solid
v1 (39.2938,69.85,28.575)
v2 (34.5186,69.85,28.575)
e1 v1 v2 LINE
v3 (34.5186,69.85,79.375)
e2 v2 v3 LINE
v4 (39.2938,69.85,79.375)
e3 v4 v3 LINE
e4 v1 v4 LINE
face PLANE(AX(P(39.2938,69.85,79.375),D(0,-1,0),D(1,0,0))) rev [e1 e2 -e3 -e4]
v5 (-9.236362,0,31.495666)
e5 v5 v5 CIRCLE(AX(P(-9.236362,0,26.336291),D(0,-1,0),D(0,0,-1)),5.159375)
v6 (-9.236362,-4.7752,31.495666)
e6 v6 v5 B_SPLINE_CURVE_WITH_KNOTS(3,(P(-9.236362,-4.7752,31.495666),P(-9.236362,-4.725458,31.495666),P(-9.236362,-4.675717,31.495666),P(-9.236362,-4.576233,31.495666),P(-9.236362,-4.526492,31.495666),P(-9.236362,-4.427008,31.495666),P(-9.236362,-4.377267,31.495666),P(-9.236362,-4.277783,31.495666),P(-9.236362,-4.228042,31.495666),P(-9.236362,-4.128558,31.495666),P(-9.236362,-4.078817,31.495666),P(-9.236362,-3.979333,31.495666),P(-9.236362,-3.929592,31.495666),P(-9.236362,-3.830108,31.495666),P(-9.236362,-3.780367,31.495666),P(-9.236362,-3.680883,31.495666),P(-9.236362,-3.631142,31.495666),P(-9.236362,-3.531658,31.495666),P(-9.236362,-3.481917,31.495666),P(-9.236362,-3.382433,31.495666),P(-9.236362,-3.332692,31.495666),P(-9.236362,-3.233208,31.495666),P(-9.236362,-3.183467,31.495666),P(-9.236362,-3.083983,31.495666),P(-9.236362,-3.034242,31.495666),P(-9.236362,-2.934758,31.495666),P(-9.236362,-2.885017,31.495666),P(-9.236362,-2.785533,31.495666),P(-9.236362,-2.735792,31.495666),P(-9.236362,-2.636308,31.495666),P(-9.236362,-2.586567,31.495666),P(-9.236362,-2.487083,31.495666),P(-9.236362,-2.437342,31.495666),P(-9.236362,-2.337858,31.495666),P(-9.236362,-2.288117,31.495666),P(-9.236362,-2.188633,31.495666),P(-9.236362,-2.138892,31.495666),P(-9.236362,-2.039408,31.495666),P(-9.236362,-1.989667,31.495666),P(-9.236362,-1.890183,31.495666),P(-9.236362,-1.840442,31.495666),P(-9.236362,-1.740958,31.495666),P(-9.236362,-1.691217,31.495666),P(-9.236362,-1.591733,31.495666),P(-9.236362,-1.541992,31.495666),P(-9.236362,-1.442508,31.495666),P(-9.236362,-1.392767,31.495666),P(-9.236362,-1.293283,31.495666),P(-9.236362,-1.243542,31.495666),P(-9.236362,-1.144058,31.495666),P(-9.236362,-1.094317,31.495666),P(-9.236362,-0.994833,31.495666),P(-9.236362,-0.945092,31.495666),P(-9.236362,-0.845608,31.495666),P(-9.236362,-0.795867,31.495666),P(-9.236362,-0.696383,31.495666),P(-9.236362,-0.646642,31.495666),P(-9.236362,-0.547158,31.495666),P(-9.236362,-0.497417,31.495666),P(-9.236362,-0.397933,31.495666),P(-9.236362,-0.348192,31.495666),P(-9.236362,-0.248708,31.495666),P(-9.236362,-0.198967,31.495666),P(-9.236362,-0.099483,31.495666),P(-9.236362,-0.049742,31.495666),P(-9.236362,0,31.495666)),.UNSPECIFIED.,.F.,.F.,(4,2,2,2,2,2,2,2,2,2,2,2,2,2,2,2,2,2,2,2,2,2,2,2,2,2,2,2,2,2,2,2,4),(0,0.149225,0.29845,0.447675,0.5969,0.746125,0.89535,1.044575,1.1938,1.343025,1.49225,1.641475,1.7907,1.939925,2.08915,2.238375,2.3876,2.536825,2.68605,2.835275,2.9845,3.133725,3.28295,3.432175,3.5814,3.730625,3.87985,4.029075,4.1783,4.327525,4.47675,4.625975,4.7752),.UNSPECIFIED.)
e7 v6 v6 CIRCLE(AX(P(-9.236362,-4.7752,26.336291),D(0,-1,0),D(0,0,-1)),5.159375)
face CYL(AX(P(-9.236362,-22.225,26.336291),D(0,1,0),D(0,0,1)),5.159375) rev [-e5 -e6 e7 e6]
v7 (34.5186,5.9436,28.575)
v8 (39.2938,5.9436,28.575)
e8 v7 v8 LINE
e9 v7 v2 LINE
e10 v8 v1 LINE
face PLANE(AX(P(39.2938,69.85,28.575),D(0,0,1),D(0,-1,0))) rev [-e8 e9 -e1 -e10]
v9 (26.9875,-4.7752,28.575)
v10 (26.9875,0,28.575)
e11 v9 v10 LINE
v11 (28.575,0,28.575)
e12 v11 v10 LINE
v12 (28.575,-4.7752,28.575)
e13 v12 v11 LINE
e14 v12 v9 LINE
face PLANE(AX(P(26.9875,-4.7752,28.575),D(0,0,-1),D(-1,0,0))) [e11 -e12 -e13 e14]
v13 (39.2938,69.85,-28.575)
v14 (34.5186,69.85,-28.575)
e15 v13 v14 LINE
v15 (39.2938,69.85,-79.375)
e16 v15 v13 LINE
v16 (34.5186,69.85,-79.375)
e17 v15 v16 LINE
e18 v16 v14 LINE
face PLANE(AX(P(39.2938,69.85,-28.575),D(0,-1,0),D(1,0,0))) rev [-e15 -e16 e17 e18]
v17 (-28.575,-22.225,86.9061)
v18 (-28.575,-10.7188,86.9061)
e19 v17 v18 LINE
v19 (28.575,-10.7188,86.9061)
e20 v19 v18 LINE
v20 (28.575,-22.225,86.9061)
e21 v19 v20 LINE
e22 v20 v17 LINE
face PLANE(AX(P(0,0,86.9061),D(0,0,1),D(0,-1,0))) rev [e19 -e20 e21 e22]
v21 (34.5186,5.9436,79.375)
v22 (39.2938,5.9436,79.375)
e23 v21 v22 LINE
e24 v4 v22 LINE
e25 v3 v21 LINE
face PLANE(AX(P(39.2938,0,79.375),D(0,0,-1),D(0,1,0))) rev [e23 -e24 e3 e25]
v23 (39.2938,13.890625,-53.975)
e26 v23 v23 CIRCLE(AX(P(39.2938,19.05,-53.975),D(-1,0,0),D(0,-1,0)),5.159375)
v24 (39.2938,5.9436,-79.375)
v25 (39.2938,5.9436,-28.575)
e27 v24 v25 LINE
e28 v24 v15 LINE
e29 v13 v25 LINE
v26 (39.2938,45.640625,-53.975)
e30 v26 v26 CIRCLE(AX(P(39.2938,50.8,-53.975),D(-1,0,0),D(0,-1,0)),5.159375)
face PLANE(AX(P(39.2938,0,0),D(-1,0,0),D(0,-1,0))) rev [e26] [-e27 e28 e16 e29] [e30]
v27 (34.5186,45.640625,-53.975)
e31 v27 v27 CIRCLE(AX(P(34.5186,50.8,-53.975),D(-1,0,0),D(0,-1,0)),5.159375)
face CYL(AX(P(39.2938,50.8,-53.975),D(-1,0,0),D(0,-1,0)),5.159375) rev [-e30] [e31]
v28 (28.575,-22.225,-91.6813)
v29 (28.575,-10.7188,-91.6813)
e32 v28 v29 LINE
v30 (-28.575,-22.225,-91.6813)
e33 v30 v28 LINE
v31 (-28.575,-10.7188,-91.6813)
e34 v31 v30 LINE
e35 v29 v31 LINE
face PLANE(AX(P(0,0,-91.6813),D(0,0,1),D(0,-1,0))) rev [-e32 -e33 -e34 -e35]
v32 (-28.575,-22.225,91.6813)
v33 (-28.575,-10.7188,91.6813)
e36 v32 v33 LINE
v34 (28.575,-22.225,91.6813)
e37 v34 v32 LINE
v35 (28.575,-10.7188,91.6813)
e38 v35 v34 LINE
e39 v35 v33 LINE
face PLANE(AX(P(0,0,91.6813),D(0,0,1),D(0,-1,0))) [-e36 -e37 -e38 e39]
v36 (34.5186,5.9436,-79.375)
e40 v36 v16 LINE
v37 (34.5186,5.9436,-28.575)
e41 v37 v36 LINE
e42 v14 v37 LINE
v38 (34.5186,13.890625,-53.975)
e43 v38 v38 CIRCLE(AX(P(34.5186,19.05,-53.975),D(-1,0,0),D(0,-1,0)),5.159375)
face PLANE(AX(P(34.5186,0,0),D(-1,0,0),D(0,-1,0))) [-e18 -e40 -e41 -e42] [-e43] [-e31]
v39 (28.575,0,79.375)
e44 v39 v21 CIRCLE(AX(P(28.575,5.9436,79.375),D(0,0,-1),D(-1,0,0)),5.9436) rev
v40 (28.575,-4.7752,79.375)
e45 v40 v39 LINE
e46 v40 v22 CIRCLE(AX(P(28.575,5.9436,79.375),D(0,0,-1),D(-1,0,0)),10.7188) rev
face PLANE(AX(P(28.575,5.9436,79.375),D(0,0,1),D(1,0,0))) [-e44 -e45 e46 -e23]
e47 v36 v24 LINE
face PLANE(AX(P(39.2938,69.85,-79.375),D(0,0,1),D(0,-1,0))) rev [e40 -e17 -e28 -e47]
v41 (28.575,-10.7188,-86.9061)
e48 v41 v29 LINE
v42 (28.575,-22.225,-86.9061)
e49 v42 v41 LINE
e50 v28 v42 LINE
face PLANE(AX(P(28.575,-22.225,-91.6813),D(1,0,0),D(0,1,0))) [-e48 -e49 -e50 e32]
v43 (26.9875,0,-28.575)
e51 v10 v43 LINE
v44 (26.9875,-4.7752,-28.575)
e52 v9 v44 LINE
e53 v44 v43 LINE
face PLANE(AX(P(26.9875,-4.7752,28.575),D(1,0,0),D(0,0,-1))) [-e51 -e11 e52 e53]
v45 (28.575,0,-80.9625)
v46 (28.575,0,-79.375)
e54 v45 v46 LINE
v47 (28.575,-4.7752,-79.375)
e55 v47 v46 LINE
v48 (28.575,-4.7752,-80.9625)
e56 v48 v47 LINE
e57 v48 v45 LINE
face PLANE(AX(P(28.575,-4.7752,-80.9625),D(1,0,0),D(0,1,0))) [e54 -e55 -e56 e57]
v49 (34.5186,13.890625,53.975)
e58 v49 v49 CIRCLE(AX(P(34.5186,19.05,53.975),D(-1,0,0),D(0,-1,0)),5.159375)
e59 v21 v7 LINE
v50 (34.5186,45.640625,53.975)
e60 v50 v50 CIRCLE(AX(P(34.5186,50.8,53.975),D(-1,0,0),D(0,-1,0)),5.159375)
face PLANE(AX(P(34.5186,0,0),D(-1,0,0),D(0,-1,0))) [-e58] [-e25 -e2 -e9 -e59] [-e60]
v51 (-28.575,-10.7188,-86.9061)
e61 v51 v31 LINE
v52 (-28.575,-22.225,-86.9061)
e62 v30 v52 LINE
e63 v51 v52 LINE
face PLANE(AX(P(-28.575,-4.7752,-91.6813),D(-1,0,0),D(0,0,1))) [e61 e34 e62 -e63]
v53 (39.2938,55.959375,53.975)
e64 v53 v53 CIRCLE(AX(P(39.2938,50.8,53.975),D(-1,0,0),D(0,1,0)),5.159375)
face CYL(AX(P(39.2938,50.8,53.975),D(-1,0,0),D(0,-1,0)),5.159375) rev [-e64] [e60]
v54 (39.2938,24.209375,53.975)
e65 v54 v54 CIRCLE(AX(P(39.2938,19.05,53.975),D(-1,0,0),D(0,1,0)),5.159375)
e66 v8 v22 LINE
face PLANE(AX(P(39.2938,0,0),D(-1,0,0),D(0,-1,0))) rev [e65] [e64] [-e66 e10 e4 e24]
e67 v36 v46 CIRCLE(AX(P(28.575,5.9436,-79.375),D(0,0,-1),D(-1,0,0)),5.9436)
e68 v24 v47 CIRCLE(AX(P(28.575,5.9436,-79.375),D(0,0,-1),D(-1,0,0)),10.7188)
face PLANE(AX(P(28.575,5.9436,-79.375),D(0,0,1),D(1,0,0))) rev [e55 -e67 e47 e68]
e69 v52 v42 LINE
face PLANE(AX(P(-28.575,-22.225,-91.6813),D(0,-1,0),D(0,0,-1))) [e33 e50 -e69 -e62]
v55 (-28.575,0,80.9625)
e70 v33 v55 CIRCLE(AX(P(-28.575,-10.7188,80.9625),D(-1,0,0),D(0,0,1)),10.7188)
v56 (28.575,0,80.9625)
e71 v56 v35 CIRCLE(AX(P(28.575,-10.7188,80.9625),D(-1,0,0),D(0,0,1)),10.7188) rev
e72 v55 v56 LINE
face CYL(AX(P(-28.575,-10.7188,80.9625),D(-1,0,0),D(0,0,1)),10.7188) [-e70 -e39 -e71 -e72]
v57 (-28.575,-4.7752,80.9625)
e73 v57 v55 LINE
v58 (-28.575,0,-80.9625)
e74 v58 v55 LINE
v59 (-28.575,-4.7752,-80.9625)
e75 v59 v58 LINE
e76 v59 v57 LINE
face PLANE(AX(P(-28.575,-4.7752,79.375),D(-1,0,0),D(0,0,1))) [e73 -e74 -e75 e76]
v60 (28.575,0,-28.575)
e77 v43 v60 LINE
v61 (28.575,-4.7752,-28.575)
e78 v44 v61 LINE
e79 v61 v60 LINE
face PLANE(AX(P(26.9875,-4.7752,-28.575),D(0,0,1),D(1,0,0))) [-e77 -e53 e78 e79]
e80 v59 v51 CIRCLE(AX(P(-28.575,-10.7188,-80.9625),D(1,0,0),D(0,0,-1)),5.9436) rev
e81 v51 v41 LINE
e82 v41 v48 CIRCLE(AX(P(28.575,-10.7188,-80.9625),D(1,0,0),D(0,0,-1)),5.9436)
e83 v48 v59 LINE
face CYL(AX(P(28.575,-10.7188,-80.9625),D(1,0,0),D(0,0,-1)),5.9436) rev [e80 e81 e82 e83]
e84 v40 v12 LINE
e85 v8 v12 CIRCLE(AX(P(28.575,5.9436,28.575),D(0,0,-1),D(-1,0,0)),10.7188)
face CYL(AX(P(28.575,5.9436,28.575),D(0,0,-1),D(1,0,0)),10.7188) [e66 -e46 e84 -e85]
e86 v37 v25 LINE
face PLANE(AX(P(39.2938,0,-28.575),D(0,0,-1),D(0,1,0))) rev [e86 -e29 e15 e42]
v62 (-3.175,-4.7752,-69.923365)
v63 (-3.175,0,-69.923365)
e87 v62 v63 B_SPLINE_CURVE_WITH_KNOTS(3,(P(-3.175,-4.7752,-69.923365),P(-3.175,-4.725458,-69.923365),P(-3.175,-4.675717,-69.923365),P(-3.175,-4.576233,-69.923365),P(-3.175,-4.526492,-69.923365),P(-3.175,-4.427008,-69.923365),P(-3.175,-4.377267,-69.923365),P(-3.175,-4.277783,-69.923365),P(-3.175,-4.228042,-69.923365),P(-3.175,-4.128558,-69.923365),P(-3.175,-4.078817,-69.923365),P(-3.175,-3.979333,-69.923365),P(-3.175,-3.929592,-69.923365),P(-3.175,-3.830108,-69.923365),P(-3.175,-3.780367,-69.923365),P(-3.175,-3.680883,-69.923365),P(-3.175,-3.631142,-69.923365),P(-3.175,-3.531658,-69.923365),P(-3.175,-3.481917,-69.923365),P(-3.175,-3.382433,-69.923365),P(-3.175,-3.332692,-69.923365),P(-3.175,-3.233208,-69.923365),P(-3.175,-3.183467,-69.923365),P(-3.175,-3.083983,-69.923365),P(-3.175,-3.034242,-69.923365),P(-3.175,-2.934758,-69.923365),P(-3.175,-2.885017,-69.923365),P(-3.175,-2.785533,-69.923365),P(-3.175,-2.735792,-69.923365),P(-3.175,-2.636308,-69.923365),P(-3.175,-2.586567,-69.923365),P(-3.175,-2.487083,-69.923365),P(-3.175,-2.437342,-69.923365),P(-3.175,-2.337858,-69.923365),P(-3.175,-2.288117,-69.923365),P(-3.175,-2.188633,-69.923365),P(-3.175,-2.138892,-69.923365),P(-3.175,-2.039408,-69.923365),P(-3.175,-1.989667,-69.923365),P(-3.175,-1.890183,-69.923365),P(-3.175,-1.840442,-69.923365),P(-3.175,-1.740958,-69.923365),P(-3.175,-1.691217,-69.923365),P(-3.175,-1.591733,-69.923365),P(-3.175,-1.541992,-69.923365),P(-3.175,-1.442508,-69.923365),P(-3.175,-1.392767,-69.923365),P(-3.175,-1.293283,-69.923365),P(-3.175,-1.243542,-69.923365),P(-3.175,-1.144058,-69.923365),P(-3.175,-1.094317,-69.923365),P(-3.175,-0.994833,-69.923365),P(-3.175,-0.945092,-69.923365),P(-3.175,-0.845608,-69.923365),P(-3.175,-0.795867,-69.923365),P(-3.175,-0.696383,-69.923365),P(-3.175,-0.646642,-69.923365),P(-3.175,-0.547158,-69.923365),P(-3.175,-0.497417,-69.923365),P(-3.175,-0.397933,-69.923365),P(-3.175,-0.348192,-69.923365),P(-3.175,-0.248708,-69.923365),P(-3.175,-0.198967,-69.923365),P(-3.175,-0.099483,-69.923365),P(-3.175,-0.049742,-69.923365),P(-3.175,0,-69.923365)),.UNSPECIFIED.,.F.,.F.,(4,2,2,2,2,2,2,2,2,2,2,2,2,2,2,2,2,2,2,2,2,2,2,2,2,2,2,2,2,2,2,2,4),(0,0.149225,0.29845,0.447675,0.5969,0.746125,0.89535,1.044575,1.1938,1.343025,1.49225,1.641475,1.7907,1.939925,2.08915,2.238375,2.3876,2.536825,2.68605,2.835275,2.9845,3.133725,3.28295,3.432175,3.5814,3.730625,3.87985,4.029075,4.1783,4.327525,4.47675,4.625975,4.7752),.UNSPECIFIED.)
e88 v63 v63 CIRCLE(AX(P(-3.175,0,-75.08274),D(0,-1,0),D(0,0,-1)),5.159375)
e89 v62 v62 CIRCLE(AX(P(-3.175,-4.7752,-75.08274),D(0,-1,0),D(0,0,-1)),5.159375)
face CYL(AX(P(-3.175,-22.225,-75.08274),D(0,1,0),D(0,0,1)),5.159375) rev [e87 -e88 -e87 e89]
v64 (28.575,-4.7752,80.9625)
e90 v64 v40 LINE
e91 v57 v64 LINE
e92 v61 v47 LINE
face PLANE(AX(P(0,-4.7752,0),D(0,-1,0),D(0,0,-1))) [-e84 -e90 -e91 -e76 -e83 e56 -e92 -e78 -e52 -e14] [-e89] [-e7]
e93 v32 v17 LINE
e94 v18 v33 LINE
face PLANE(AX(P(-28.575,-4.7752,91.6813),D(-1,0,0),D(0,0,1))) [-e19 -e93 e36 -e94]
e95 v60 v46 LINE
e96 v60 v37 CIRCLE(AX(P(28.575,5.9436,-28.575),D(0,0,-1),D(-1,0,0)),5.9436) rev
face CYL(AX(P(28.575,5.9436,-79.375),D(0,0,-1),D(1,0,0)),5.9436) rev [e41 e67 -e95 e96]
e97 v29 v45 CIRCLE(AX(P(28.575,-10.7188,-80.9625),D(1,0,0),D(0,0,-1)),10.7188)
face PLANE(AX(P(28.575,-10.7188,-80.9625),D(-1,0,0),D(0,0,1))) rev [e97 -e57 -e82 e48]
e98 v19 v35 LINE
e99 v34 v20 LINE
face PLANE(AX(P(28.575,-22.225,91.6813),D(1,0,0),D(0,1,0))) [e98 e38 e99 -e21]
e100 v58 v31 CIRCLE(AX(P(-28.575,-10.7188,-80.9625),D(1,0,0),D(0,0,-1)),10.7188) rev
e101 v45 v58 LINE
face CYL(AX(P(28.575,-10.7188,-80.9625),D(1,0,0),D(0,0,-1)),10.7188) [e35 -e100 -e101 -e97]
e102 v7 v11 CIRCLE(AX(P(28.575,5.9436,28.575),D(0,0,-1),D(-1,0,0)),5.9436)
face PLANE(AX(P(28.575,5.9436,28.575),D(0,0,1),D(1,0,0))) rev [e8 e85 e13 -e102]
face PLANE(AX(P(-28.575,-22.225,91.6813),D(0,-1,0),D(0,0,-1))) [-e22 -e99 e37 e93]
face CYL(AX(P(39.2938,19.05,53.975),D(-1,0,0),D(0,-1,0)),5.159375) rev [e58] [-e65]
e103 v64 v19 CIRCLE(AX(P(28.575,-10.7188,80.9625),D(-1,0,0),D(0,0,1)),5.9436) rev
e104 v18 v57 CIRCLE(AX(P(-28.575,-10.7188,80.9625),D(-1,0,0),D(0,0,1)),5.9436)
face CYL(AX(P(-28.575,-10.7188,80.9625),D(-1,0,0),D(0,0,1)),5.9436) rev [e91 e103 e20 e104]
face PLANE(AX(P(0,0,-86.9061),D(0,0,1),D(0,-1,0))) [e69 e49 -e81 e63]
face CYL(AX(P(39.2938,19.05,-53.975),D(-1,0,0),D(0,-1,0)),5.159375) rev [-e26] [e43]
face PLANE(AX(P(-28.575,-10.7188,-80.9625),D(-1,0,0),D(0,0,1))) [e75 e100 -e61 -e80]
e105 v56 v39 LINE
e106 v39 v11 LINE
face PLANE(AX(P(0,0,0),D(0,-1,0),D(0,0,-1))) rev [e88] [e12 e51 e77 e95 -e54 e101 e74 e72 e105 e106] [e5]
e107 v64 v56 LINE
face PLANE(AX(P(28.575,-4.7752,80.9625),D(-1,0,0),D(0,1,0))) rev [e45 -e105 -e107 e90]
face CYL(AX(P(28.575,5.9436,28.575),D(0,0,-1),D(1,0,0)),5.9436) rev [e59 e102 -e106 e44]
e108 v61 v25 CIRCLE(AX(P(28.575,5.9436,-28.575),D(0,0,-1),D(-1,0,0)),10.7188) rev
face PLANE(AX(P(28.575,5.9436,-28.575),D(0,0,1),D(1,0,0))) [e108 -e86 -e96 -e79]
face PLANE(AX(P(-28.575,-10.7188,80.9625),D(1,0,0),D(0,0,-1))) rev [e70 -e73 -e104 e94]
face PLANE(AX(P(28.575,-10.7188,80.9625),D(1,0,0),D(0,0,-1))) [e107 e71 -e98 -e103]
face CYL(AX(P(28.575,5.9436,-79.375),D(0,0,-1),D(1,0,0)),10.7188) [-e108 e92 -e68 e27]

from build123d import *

# Parameters (mm, degrees)
BASE_FLANGE1_DEPTH      = 4.7752
EDGE_FLANGE1_DEPTH      = 50.8
EDGE_FLANGE1_BEND_DEPTH = 50.8
EDGE_FLANGE2_DEPTH      = 57.15
EDGE_FLANGE2_BEND_DEPTH = 57.15
CUT_EXTRUDE1_DEPTH      = 132.397433882
CUT_EXTRUDE1_DEPTH_BACK = 132.397433882
SKETCH18_R              = 5.159375
CUT_EXTRUDE3_DEPTH      = 122.772271015
CUT_EXTRUDE3_DEPTH_BACK = 122.772271015
SKETCH20_R              = 5.159375


# Sheet-metal steps are written as plain solids
with BuildPart() as part:
    # Sketch1 → Base-Flange1 (new body)
    with BuildSketch(Plane(origin=(0, 0, 0), x_dir=(1, 0, 0), z_dir=(0, 1, 0))):
        Polygon((26.9875, -28.575), (26.9875, 28.575), (28.575, 28.575), (28.575, 79.375), (-28.575, 79.375), (-28.575, -79.375), (28.575, -79.375), (28.575, -28.575), align=None)
    extrude(amount=-BASE_FLANGE1_DEPTH)

    # Edge-Flange1 section (across the edge) → Edge-Flange1 (add)
    with BuildSketch(Plane(origin=(34.5186, 0, -28.575), x_dir=(-1, 0, 0), z_dir=(0, 0, -1))):
        with BuildLine():
            Line((-4.7752, 5.9436), (-4.7752, 69.85))
            Line((-4.7752, 69.85), (0, 69.85))
            Line((0, 69.85), (0, 5.9436))
            ThreePointArc((0, 5.9436), (1.740840135, 1.740840135), (5.9436, 0))
            Line((5.9436, 0), (5.9436, -4.7752))
            ThreePointArc((5.9436, -4.7752), (-1.635736166, -1.635736166), (-4.7752, 5.9436))
        make_face()
    extrude(amount=EDGE_FLANGE1_DEPTH)

    # Edge-Flange1 section 2 (across the edge) → Edge-Flange1 bend (add)
    with BuildSketch(Plane(origin=(34.5186, 0, 79.375), x_dir=(-1, 0, 0), z_dir=(0, 0, -1))):
        with BuildLine():
            Line((-4.7752, 5.9436), (-4.7752, 69.85))
            Line((-4.7752, 69.85), (0, 69.85))
            Line((0, 69.85), (0, 5.9436))
            ThreePointArc((0, 5.9436), (1.740840135, 1.740840135), (5.9436, 0))
            Line((5.9436, 0), (5.9436, -4.7752))
            ThreePointArc((5.9436, -4.7752), (-1.635736166, -1.635736166), (-4.7752, 5.9436))
        make_face()
    extrude(amount=EDGE_FLANGE1_BEND_DEPTH)

    # Edge-Flange2 section (across the edge) → Edge-Flange2 (add)
    with BuildSketch(Plane(origin=(28.575, -4.7752, 86.9061), x_dir=(0, 0, -1), z_dir=(-1, 0, 0))):
        with BuildLine():
            Line((-4.7752, 5.9436), (-4.7752, 17.4498))
            Line((-4.7752, 17.4498), (0, 17.4498))
            Line((0, 17.4498), (0, 5.9436))
            ThreePointArc((0, 5.9436), (1.740840135, 1.740840135), (5.9436, 0))
            Line((5.9436, 0), (7.5311, 0))
            Line((7.5311, 0), (7.5311, -4.7752))
            Line((7.5311, -4.7752), (5.9436, -4.7752))
            ThreePointArc((5.9436, -4.7752), (-1.635736166, -1.635736166), (-4.7752, 5.9436))
        make_face()
    extrude(amount=EDGE_FLANGE2_DEPTH)

    # Edge-Flange2 section 2 (across the edge) → Edge-Flange2 bend (add)
    with BuildSketch(Plane(origin=(-28.575, -4.7752, -86.9061), x_dir=(0, 0, 1), z_dir=(1, 0, 0))):
        with BuildLine():
            Line((-4.7752, 5.9436), (-4.7752, 17.4498))
            Line((-4.7752, 17.4498), (0, 17.4498))
            Line((0, 17.4498), (0, 5.9436))
            ThreePointArc((0, 5.9436), (1.740840135, 1.740840135), (5.9436, 0))
            Line((5.9436, 0), (7.5311, 0))
            Line((7.5311, 0), (7.5311, -4.7752))
            Line((7.5311, -4.7752), (5.9436, -4.7752))
            ThreePointArc((5.9436, -4.7752), (-1.635736166, -1.635736166), (-4.7752, 5.9436))
        make_face()
    extrude(amount=EDGE_FLANGE2_BEND_DEPTH)

    # Sketch18 → Cut-Extrude1 (cut, two sides: drawn at the far end of the back side and taken through both)
    with BuildSketch(Plane.ZY.offset(-34.5186).offset(-CUT_EXTRUDE1_DEPTH_BACK)):
        with Locations(Location((-53.975, 50.8, 0), (0, 0, 270))):
            Circle(SKETCH18_R)
        with Locations(Location((-53.975, 19.05, 0), (0, 0, 270))):
            Circle(SKETCH18_R)
        with Locations(Location((53.975, 50.8, 0), (0, 0, 270))):
            Circle(SKETCH18_R)
        with Locations(Location((53.975, 19.05, 0), (0, 0, 270))):
            Circle(SKETCH18_R)
    extrude(amount=CUT_EXTRUDE1_DEPTH + CUT_EXTRUDE1_DEPTH_BACK, mode=Mode.SUBTRACT)

    # Sketch20 → Cut-Extrude3 (cut, two sides: drawn at the far end of the back side and taken through both)
    with BuildSketch(Plane(origin=(0, 0, 0), x_dir=(1, 0, 0), z_dir=(0, 1, 0)).offset(-CUT_EXTRUDE3_DEPTH_BACK)):
        with Locations((-72.900583951, 79.249926239)):
            Circle(SKETCH20_R)
        with Locations(Location((-3.175, 75.082739816, 0), (0, 0, 270))):
            Circle(SKETCH20_R)
        with Locations(Location((-9.236362071, -26.336291386, 0), (0, 0, 270))):
            Circle(SKETCH20_R)
        with Locations((-78.961946022, -22.169104962)):
            Circle(SKETCH20_R)
    extrude(amount=CUT_EXTRUDE3_DEPTH + CUT_EXTRUDE3_DEPTH_BACK, mode=Mode.SUBTRACT)


solid = part.part
